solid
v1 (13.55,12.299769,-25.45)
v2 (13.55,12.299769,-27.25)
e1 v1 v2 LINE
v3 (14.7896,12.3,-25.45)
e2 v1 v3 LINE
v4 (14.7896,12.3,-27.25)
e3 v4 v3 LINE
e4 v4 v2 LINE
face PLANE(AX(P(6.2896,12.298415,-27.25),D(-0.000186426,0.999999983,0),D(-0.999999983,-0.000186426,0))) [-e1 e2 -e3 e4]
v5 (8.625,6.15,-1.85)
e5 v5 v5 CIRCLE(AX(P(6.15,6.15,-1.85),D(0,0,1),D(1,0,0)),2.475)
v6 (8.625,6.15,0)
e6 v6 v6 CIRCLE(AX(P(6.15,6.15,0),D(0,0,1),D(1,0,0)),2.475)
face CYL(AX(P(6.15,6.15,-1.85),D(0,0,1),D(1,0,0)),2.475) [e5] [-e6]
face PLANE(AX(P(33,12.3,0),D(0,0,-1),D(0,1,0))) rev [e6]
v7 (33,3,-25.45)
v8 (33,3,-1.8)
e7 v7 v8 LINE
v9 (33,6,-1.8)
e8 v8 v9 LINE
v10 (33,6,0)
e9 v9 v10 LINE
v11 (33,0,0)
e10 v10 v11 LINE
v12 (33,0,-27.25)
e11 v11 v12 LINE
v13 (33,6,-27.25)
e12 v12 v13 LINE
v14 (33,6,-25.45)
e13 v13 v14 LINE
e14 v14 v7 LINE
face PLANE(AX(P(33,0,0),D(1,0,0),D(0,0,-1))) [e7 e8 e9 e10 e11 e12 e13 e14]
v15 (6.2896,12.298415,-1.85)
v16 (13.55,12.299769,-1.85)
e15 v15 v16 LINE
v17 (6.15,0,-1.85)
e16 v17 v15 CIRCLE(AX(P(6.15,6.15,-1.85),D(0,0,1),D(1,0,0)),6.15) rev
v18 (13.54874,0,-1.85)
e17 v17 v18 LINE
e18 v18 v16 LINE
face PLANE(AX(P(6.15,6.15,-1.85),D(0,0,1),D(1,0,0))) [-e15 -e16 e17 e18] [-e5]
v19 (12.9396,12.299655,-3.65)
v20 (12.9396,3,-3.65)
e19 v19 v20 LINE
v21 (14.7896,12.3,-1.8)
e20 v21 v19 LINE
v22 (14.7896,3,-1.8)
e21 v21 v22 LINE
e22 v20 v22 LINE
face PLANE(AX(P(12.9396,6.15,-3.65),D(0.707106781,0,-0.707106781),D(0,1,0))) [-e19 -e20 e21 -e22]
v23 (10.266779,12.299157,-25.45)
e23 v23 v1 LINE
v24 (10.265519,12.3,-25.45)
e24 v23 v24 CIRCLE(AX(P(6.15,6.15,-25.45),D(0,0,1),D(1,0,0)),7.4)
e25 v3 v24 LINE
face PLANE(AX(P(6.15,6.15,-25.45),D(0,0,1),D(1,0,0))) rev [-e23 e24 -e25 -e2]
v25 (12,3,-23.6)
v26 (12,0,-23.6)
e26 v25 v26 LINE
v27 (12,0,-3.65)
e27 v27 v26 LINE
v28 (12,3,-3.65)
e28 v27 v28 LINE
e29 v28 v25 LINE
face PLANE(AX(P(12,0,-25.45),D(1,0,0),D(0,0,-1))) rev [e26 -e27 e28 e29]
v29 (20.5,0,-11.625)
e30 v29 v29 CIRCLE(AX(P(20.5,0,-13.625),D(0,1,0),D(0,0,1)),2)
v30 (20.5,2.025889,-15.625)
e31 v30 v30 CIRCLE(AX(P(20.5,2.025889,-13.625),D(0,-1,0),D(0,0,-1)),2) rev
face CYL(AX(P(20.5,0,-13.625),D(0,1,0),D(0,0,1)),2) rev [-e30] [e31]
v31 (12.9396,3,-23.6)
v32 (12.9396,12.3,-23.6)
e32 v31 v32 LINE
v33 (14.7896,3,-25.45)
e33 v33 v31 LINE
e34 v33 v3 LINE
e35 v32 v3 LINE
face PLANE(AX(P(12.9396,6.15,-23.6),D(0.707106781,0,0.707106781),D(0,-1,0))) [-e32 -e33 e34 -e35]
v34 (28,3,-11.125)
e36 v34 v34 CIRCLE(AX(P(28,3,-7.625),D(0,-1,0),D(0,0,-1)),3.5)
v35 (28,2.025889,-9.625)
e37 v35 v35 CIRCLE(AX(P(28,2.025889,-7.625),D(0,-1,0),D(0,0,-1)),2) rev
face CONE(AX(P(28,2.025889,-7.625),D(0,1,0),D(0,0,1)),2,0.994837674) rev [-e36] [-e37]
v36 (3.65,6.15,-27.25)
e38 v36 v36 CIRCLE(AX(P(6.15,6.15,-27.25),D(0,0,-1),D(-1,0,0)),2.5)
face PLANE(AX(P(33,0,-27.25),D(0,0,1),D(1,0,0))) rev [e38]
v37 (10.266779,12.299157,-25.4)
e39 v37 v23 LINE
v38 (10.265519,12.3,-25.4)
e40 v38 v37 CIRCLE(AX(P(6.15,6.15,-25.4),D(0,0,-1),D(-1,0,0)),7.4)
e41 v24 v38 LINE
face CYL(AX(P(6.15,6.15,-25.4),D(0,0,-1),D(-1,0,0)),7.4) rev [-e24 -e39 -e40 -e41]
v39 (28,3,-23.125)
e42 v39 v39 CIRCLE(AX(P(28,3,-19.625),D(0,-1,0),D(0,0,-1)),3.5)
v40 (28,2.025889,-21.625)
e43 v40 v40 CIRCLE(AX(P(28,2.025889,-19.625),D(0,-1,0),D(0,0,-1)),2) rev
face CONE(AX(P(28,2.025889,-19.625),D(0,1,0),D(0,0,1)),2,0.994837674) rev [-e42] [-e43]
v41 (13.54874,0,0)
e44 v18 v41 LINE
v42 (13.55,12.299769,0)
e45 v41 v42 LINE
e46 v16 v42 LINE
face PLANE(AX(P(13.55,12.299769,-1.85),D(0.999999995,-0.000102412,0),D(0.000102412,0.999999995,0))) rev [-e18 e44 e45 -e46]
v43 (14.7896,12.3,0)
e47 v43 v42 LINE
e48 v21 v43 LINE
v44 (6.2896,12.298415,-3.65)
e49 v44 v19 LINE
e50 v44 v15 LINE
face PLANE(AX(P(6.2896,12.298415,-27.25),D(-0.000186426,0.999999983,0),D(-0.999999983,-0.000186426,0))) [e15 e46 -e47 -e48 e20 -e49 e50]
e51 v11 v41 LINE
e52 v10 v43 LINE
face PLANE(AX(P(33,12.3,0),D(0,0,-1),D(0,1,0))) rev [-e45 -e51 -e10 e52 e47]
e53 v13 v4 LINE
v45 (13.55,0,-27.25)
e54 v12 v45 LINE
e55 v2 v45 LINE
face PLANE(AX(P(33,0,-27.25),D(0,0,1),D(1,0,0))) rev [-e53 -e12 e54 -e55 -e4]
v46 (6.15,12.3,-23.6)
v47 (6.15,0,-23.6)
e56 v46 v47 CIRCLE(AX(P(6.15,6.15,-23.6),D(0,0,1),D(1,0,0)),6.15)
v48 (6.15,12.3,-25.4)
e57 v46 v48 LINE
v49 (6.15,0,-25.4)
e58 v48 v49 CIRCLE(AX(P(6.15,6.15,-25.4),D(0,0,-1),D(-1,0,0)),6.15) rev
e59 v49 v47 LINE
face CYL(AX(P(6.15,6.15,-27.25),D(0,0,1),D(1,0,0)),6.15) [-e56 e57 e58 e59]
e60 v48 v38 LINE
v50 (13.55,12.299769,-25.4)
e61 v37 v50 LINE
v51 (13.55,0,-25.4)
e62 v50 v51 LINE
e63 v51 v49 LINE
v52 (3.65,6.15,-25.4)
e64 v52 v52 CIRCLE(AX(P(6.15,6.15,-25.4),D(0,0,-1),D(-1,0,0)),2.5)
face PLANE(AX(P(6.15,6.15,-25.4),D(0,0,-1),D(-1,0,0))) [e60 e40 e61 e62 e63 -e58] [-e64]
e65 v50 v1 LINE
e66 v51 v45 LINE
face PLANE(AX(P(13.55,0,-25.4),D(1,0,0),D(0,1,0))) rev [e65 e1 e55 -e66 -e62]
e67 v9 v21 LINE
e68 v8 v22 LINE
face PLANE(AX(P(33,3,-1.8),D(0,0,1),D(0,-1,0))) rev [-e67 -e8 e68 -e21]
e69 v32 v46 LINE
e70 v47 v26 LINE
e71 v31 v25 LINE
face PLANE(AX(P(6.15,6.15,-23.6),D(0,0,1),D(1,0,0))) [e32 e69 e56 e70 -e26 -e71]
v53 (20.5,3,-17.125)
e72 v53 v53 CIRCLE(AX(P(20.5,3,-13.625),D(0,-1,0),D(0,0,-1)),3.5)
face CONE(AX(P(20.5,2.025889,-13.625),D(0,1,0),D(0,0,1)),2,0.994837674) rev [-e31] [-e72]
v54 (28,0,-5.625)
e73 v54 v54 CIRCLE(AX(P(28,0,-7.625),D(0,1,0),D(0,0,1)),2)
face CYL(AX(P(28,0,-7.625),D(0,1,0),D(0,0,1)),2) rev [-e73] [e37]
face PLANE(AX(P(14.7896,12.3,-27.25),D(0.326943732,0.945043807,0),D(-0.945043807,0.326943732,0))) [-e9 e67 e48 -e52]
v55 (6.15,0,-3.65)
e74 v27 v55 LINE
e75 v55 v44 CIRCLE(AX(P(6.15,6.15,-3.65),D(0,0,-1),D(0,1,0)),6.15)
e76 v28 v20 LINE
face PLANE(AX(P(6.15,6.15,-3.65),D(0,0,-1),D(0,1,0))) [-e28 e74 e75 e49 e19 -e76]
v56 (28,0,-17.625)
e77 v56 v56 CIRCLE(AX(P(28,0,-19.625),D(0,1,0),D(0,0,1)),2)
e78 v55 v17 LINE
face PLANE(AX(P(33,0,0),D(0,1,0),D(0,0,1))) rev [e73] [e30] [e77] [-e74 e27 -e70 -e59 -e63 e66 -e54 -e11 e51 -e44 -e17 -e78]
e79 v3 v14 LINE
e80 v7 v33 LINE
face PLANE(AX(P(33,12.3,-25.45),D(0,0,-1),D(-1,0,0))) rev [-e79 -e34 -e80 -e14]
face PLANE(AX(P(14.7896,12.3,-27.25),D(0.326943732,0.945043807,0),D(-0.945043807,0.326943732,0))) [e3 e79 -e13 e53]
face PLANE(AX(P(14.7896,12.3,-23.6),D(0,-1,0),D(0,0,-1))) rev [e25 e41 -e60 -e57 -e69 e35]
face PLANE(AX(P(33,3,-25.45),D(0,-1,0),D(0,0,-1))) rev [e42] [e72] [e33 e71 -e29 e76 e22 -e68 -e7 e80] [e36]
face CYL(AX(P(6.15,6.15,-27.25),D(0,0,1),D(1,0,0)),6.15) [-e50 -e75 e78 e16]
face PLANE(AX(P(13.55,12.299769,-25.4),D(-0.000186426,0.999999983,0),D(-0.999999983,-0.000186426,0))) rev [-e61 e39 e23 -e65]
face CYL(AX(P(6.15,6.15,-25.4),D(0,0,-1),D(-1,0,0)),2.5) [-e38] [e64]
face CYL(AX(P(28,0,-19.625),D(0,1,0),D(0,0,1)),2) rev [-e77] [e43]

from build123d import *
from build123d.topology import SkipClean

# Parameters (mm, degrees)
PROFILEBOSS_EXTRUDE1_DEPTH           = 33
SKETCH2_OUTSIDE_W                    = 43.906
SKETCH2_OUTSIDE_H                    = 23.206
SIDEPROFILECUT_EXTRUDE1_DEPTH        = 45.529231972
SKETCH3_W                            = 11.132045058
SKETCH3_H                            = 23.65
BOTTOMCUT_EXTRUDE2_DEPTH             = 44.795576261
DRAGLINKMOUNTHOLESSKETCH4_R          = 2
DRAGLINKMOUNTHOLESCUT_EXTRUDE3_DEPTH = 44.795576261
CHAMFER1_SIZE                        = 1.5
CHAMFER1_SIZE2                       = 0.97411139
RIGHTINNERBOSS_EXTRUDE3_START        = 1.85
RIGHTINNERBOSS_EXTRUDE3_DEPTH        = 1.85
LEFTINNERBOSS_EXTRUDE4_DEPTH         = 1.85
RIGHTOUTERCIRCLESKETCH7_R            = 2.5
RIGHTOUTERCIRCLECUT_EXTRUDE4_DEPTH   = 1.85
LEFTOUTERCIRCLECUT_EXTRUDE5_START    = -1.85
SKETCH8_R                            = 2.475
LEFTOUTERCIRCLECUT_EXTRUDE5_DEPTH    = 1.85
CHAMFER2_SIZE                        = 1.85


with BuildPart() as part:
    # Sketch1 → ProfileBoss-Extrude1 (new body)
    with BuildSketch(Plane(origin=(0, 0, 0), x_dir=(0, 0, -1), z_dir=(1, 0, 0))):
        Polygon((0, 12.3), (0, 0), (27.25, 0), (27.25, 12.3), (25.45, 12.3), (25.45, 3), (1.8, 3), (1.8, 12.3), align=None)
    extrude(amount=PROFILEBOSS_EXTRUDE1_DEPTH)

    # Sketch2 outside → SideProfileCut-Extrude1 (cut, through all)
    with BuildSketch(Plane.XY):
        with Locations((16.5, 6.15)):
            Rectangle(SKETCH2_OUTSIDE_W, SKETCH2_OUTSIDE_H)
        with BuildLine():
            Line((14.789600469, 12.3), (33, 6))
            Line((33, 6), (33, 0))
            Line((33, 0), (6.15, 0))
            ThreePointArc((6.15, 0), (0.000396167, 6.219804731), (6.289600469, 12.298415382))
            Line((6.289600469, 12.298415382), (14.789600469, 12.3))
        make_face(mode=Mode.SUBTRACT)
    extrude(amount=-SIDEPROFILECUT_EXTRUDE1_DEPTH, mode=Mode.SUBTRACT)

    # Sketch3 → BottomCut-Extrude2 (cut, through all)
    with BuildSketch(Plane(origin=(0, 3, 0), x_dir=(1, 0, 0), z_dir=(0, 1, 0))):
        with Locations((6.433977471, 13.625)):
            Rectangle(SKETCH3_W, SKETCH3_H)
    extrude(amount=-BOTTOMCUT_EXTRUDE2_DEPTH, mode=Mode.SUBTRACT)

    # DragLinkMountHolesSketch4 → DragLinkMountHolesCut-Extrude3 (cut, through all)
    with BuildSketch(Plane(origin=(0, 3, 0), x_dir=(1, 0, 0), z_dir=(0, 1, 0))):
        with Locations(Location((28, 19.625, 0), (0, 0, 270))):
            Circle(DRAGLINKMOUNTHOLESSKETCH4_R)
        with Locations(Location((28, 7.625, 0), (0, 0, 270))):
            Circle(DRAGLINKMOUNTHOLESSKETCH4_R)
        with Locations(Location((20.5, 13.625, 0), (0, 0, 270))):
            Circle(DRAGLINKMOUNTHOLESSKETCH4_R)
    extrude(amount=-DRAGLINKMOUNTHOLESCUT_EXTRUDE3_DEPTH, mode=Mode.SUBTRACT)

    # Chamfer1
    chamfer1_edges = [part.edges().sort_by_distance(p)[0] for p in [
        (28, 3, -21.625),
        (28, 3, -9.625),
        (20.5, 3, -15.625),
    ]]
    chamfer1_side = [part.faces().sort_by_distance(p)[0] for p in [
        (12.316278754, 3, -13.625),
    ]]
    chamfer(chamfer1_edges, length=CHAMFER1_SIZE, length2=CHAMFER1_SIZE2, reference=chamfer1_side[0])

    # Sketch11 → RightInnerBoss-Extrude3 (add)
    with BuildSketch(Plane.XY.offset(-25.45).offset(RIGHTINNERBOSS_EXTRUDE3_START)):
        with BuildLine():
            Line((14.789600469, 12.3), (6.15, 12.3))
            ThreePointArc((6.15, 12.3), (0, 6.15), (6.15, 0))
            Line((6.15, 0), (14.789600469, 0))
            Line((14.789600469, 0), (14.789600469, 12.3))
        make_face()
    extrude(amount=-RIGHTINNERBOSS_EXTRUDE3_DEPTH)

    # Sketch12 → LeftInnerBoss-Extrude4 (add)
    with SkipClean():  # the faces are left unmerged after this step: merging them gives an invalid solid
        with BuildSketch(Plane(origin=(0, 0, -1.8), x_dir=(-1, 0, 0), z_dir=(0, 0, -1))):
            with BuildLine():
                Line((-14.789600469, 12.3), (-6.289600469, 12.298415382))
                ThreePointArc((-6.289600469, 12.298415382), (-0.000396167, 6.219804731), (-6.15, 0))
                Line((-6.15, 0), (-14.789600469, 0))
                Line((-14.789600469, 0), (-14.789600469, 12.3))
            make_face()
        extrude(amount=LEFTINNERBOSS_EXTRUDE4_DEPTH)

    # RightOuterCircleSketch7 → RightOuterCircleCut-Extrude4 (cut)
    with SkipClean():  # the faces are left unmerged after this step: merging them gives an invalid solid
        with BuildSketch(Plane(origin=(0, 0, -27.25), x_dir=(-1, 0, 0), z_dir=(0, 0, -1))):
            with BuildLine():
                Line((-13.55, 12.299768907), (-10.266779115, 12.29915683))
                ThreePointArc((-10.266779115, 12.29915683), (1.249999961, 6.150757924), (-10.265519408, 0))
                Line((-10.265519408, 0), (-13.55, 0))
                Line((-13.55, 0), (-13.55, 12.299768907))
            make_face()
            with Locations((-6.15, 6.15)):
                Circle(RIGHTOUTERCIRCLESKETCH7_R, mode=Mode.SUBTRACT)
        extrude(amount=-RIGHTOUTERCIRCLECUT_EXTRUDE4_DEPTH, mode=Mode.SUBTRACT)

    # Sketch8 → LeftOuterCircleCut-Extrude5 (cut)
    with BuildSketch(Plane.XY.offset(LEFTOUTERCIRCLECUT_EXTRUDE5_START)):
        with BuildLine():
            Line((13.550000004, 12.299768907), (10.266779119, 12.29915683))
            ThreePointArc((10.266779119, 12.29915683), (-1.249999964, 6.150757924), (10.265519413, 0))
            Line((10.265519413, 0), (13.548740355, 0))
            Line((13.548740355, 0), (13.550000004, 12.299768907))
        make_face()
        with Locations((6.15, 6.15)):
            Circle(SKETCH8_R, mode=Mode.SUBTRACT)
    extrude(amount=LEFTOUTERCIRCLECUT_EXTRUDE5_DEPTH, mode=Mode.SUBTRACT)

    # Chamfer2
    chamfer2_edges = [part.edges().sort_by_distance(p)[0] for p in [
        (14.789600469, 7.65, -23.6),
        (14.789600469, 7.65, -3.65),
    ]]
    chamfer(chamfer2_edges, length=CHAMFER2_SIZE - 0.0001)  # a hair under: the kernel refuses the full size


solid = part.part
